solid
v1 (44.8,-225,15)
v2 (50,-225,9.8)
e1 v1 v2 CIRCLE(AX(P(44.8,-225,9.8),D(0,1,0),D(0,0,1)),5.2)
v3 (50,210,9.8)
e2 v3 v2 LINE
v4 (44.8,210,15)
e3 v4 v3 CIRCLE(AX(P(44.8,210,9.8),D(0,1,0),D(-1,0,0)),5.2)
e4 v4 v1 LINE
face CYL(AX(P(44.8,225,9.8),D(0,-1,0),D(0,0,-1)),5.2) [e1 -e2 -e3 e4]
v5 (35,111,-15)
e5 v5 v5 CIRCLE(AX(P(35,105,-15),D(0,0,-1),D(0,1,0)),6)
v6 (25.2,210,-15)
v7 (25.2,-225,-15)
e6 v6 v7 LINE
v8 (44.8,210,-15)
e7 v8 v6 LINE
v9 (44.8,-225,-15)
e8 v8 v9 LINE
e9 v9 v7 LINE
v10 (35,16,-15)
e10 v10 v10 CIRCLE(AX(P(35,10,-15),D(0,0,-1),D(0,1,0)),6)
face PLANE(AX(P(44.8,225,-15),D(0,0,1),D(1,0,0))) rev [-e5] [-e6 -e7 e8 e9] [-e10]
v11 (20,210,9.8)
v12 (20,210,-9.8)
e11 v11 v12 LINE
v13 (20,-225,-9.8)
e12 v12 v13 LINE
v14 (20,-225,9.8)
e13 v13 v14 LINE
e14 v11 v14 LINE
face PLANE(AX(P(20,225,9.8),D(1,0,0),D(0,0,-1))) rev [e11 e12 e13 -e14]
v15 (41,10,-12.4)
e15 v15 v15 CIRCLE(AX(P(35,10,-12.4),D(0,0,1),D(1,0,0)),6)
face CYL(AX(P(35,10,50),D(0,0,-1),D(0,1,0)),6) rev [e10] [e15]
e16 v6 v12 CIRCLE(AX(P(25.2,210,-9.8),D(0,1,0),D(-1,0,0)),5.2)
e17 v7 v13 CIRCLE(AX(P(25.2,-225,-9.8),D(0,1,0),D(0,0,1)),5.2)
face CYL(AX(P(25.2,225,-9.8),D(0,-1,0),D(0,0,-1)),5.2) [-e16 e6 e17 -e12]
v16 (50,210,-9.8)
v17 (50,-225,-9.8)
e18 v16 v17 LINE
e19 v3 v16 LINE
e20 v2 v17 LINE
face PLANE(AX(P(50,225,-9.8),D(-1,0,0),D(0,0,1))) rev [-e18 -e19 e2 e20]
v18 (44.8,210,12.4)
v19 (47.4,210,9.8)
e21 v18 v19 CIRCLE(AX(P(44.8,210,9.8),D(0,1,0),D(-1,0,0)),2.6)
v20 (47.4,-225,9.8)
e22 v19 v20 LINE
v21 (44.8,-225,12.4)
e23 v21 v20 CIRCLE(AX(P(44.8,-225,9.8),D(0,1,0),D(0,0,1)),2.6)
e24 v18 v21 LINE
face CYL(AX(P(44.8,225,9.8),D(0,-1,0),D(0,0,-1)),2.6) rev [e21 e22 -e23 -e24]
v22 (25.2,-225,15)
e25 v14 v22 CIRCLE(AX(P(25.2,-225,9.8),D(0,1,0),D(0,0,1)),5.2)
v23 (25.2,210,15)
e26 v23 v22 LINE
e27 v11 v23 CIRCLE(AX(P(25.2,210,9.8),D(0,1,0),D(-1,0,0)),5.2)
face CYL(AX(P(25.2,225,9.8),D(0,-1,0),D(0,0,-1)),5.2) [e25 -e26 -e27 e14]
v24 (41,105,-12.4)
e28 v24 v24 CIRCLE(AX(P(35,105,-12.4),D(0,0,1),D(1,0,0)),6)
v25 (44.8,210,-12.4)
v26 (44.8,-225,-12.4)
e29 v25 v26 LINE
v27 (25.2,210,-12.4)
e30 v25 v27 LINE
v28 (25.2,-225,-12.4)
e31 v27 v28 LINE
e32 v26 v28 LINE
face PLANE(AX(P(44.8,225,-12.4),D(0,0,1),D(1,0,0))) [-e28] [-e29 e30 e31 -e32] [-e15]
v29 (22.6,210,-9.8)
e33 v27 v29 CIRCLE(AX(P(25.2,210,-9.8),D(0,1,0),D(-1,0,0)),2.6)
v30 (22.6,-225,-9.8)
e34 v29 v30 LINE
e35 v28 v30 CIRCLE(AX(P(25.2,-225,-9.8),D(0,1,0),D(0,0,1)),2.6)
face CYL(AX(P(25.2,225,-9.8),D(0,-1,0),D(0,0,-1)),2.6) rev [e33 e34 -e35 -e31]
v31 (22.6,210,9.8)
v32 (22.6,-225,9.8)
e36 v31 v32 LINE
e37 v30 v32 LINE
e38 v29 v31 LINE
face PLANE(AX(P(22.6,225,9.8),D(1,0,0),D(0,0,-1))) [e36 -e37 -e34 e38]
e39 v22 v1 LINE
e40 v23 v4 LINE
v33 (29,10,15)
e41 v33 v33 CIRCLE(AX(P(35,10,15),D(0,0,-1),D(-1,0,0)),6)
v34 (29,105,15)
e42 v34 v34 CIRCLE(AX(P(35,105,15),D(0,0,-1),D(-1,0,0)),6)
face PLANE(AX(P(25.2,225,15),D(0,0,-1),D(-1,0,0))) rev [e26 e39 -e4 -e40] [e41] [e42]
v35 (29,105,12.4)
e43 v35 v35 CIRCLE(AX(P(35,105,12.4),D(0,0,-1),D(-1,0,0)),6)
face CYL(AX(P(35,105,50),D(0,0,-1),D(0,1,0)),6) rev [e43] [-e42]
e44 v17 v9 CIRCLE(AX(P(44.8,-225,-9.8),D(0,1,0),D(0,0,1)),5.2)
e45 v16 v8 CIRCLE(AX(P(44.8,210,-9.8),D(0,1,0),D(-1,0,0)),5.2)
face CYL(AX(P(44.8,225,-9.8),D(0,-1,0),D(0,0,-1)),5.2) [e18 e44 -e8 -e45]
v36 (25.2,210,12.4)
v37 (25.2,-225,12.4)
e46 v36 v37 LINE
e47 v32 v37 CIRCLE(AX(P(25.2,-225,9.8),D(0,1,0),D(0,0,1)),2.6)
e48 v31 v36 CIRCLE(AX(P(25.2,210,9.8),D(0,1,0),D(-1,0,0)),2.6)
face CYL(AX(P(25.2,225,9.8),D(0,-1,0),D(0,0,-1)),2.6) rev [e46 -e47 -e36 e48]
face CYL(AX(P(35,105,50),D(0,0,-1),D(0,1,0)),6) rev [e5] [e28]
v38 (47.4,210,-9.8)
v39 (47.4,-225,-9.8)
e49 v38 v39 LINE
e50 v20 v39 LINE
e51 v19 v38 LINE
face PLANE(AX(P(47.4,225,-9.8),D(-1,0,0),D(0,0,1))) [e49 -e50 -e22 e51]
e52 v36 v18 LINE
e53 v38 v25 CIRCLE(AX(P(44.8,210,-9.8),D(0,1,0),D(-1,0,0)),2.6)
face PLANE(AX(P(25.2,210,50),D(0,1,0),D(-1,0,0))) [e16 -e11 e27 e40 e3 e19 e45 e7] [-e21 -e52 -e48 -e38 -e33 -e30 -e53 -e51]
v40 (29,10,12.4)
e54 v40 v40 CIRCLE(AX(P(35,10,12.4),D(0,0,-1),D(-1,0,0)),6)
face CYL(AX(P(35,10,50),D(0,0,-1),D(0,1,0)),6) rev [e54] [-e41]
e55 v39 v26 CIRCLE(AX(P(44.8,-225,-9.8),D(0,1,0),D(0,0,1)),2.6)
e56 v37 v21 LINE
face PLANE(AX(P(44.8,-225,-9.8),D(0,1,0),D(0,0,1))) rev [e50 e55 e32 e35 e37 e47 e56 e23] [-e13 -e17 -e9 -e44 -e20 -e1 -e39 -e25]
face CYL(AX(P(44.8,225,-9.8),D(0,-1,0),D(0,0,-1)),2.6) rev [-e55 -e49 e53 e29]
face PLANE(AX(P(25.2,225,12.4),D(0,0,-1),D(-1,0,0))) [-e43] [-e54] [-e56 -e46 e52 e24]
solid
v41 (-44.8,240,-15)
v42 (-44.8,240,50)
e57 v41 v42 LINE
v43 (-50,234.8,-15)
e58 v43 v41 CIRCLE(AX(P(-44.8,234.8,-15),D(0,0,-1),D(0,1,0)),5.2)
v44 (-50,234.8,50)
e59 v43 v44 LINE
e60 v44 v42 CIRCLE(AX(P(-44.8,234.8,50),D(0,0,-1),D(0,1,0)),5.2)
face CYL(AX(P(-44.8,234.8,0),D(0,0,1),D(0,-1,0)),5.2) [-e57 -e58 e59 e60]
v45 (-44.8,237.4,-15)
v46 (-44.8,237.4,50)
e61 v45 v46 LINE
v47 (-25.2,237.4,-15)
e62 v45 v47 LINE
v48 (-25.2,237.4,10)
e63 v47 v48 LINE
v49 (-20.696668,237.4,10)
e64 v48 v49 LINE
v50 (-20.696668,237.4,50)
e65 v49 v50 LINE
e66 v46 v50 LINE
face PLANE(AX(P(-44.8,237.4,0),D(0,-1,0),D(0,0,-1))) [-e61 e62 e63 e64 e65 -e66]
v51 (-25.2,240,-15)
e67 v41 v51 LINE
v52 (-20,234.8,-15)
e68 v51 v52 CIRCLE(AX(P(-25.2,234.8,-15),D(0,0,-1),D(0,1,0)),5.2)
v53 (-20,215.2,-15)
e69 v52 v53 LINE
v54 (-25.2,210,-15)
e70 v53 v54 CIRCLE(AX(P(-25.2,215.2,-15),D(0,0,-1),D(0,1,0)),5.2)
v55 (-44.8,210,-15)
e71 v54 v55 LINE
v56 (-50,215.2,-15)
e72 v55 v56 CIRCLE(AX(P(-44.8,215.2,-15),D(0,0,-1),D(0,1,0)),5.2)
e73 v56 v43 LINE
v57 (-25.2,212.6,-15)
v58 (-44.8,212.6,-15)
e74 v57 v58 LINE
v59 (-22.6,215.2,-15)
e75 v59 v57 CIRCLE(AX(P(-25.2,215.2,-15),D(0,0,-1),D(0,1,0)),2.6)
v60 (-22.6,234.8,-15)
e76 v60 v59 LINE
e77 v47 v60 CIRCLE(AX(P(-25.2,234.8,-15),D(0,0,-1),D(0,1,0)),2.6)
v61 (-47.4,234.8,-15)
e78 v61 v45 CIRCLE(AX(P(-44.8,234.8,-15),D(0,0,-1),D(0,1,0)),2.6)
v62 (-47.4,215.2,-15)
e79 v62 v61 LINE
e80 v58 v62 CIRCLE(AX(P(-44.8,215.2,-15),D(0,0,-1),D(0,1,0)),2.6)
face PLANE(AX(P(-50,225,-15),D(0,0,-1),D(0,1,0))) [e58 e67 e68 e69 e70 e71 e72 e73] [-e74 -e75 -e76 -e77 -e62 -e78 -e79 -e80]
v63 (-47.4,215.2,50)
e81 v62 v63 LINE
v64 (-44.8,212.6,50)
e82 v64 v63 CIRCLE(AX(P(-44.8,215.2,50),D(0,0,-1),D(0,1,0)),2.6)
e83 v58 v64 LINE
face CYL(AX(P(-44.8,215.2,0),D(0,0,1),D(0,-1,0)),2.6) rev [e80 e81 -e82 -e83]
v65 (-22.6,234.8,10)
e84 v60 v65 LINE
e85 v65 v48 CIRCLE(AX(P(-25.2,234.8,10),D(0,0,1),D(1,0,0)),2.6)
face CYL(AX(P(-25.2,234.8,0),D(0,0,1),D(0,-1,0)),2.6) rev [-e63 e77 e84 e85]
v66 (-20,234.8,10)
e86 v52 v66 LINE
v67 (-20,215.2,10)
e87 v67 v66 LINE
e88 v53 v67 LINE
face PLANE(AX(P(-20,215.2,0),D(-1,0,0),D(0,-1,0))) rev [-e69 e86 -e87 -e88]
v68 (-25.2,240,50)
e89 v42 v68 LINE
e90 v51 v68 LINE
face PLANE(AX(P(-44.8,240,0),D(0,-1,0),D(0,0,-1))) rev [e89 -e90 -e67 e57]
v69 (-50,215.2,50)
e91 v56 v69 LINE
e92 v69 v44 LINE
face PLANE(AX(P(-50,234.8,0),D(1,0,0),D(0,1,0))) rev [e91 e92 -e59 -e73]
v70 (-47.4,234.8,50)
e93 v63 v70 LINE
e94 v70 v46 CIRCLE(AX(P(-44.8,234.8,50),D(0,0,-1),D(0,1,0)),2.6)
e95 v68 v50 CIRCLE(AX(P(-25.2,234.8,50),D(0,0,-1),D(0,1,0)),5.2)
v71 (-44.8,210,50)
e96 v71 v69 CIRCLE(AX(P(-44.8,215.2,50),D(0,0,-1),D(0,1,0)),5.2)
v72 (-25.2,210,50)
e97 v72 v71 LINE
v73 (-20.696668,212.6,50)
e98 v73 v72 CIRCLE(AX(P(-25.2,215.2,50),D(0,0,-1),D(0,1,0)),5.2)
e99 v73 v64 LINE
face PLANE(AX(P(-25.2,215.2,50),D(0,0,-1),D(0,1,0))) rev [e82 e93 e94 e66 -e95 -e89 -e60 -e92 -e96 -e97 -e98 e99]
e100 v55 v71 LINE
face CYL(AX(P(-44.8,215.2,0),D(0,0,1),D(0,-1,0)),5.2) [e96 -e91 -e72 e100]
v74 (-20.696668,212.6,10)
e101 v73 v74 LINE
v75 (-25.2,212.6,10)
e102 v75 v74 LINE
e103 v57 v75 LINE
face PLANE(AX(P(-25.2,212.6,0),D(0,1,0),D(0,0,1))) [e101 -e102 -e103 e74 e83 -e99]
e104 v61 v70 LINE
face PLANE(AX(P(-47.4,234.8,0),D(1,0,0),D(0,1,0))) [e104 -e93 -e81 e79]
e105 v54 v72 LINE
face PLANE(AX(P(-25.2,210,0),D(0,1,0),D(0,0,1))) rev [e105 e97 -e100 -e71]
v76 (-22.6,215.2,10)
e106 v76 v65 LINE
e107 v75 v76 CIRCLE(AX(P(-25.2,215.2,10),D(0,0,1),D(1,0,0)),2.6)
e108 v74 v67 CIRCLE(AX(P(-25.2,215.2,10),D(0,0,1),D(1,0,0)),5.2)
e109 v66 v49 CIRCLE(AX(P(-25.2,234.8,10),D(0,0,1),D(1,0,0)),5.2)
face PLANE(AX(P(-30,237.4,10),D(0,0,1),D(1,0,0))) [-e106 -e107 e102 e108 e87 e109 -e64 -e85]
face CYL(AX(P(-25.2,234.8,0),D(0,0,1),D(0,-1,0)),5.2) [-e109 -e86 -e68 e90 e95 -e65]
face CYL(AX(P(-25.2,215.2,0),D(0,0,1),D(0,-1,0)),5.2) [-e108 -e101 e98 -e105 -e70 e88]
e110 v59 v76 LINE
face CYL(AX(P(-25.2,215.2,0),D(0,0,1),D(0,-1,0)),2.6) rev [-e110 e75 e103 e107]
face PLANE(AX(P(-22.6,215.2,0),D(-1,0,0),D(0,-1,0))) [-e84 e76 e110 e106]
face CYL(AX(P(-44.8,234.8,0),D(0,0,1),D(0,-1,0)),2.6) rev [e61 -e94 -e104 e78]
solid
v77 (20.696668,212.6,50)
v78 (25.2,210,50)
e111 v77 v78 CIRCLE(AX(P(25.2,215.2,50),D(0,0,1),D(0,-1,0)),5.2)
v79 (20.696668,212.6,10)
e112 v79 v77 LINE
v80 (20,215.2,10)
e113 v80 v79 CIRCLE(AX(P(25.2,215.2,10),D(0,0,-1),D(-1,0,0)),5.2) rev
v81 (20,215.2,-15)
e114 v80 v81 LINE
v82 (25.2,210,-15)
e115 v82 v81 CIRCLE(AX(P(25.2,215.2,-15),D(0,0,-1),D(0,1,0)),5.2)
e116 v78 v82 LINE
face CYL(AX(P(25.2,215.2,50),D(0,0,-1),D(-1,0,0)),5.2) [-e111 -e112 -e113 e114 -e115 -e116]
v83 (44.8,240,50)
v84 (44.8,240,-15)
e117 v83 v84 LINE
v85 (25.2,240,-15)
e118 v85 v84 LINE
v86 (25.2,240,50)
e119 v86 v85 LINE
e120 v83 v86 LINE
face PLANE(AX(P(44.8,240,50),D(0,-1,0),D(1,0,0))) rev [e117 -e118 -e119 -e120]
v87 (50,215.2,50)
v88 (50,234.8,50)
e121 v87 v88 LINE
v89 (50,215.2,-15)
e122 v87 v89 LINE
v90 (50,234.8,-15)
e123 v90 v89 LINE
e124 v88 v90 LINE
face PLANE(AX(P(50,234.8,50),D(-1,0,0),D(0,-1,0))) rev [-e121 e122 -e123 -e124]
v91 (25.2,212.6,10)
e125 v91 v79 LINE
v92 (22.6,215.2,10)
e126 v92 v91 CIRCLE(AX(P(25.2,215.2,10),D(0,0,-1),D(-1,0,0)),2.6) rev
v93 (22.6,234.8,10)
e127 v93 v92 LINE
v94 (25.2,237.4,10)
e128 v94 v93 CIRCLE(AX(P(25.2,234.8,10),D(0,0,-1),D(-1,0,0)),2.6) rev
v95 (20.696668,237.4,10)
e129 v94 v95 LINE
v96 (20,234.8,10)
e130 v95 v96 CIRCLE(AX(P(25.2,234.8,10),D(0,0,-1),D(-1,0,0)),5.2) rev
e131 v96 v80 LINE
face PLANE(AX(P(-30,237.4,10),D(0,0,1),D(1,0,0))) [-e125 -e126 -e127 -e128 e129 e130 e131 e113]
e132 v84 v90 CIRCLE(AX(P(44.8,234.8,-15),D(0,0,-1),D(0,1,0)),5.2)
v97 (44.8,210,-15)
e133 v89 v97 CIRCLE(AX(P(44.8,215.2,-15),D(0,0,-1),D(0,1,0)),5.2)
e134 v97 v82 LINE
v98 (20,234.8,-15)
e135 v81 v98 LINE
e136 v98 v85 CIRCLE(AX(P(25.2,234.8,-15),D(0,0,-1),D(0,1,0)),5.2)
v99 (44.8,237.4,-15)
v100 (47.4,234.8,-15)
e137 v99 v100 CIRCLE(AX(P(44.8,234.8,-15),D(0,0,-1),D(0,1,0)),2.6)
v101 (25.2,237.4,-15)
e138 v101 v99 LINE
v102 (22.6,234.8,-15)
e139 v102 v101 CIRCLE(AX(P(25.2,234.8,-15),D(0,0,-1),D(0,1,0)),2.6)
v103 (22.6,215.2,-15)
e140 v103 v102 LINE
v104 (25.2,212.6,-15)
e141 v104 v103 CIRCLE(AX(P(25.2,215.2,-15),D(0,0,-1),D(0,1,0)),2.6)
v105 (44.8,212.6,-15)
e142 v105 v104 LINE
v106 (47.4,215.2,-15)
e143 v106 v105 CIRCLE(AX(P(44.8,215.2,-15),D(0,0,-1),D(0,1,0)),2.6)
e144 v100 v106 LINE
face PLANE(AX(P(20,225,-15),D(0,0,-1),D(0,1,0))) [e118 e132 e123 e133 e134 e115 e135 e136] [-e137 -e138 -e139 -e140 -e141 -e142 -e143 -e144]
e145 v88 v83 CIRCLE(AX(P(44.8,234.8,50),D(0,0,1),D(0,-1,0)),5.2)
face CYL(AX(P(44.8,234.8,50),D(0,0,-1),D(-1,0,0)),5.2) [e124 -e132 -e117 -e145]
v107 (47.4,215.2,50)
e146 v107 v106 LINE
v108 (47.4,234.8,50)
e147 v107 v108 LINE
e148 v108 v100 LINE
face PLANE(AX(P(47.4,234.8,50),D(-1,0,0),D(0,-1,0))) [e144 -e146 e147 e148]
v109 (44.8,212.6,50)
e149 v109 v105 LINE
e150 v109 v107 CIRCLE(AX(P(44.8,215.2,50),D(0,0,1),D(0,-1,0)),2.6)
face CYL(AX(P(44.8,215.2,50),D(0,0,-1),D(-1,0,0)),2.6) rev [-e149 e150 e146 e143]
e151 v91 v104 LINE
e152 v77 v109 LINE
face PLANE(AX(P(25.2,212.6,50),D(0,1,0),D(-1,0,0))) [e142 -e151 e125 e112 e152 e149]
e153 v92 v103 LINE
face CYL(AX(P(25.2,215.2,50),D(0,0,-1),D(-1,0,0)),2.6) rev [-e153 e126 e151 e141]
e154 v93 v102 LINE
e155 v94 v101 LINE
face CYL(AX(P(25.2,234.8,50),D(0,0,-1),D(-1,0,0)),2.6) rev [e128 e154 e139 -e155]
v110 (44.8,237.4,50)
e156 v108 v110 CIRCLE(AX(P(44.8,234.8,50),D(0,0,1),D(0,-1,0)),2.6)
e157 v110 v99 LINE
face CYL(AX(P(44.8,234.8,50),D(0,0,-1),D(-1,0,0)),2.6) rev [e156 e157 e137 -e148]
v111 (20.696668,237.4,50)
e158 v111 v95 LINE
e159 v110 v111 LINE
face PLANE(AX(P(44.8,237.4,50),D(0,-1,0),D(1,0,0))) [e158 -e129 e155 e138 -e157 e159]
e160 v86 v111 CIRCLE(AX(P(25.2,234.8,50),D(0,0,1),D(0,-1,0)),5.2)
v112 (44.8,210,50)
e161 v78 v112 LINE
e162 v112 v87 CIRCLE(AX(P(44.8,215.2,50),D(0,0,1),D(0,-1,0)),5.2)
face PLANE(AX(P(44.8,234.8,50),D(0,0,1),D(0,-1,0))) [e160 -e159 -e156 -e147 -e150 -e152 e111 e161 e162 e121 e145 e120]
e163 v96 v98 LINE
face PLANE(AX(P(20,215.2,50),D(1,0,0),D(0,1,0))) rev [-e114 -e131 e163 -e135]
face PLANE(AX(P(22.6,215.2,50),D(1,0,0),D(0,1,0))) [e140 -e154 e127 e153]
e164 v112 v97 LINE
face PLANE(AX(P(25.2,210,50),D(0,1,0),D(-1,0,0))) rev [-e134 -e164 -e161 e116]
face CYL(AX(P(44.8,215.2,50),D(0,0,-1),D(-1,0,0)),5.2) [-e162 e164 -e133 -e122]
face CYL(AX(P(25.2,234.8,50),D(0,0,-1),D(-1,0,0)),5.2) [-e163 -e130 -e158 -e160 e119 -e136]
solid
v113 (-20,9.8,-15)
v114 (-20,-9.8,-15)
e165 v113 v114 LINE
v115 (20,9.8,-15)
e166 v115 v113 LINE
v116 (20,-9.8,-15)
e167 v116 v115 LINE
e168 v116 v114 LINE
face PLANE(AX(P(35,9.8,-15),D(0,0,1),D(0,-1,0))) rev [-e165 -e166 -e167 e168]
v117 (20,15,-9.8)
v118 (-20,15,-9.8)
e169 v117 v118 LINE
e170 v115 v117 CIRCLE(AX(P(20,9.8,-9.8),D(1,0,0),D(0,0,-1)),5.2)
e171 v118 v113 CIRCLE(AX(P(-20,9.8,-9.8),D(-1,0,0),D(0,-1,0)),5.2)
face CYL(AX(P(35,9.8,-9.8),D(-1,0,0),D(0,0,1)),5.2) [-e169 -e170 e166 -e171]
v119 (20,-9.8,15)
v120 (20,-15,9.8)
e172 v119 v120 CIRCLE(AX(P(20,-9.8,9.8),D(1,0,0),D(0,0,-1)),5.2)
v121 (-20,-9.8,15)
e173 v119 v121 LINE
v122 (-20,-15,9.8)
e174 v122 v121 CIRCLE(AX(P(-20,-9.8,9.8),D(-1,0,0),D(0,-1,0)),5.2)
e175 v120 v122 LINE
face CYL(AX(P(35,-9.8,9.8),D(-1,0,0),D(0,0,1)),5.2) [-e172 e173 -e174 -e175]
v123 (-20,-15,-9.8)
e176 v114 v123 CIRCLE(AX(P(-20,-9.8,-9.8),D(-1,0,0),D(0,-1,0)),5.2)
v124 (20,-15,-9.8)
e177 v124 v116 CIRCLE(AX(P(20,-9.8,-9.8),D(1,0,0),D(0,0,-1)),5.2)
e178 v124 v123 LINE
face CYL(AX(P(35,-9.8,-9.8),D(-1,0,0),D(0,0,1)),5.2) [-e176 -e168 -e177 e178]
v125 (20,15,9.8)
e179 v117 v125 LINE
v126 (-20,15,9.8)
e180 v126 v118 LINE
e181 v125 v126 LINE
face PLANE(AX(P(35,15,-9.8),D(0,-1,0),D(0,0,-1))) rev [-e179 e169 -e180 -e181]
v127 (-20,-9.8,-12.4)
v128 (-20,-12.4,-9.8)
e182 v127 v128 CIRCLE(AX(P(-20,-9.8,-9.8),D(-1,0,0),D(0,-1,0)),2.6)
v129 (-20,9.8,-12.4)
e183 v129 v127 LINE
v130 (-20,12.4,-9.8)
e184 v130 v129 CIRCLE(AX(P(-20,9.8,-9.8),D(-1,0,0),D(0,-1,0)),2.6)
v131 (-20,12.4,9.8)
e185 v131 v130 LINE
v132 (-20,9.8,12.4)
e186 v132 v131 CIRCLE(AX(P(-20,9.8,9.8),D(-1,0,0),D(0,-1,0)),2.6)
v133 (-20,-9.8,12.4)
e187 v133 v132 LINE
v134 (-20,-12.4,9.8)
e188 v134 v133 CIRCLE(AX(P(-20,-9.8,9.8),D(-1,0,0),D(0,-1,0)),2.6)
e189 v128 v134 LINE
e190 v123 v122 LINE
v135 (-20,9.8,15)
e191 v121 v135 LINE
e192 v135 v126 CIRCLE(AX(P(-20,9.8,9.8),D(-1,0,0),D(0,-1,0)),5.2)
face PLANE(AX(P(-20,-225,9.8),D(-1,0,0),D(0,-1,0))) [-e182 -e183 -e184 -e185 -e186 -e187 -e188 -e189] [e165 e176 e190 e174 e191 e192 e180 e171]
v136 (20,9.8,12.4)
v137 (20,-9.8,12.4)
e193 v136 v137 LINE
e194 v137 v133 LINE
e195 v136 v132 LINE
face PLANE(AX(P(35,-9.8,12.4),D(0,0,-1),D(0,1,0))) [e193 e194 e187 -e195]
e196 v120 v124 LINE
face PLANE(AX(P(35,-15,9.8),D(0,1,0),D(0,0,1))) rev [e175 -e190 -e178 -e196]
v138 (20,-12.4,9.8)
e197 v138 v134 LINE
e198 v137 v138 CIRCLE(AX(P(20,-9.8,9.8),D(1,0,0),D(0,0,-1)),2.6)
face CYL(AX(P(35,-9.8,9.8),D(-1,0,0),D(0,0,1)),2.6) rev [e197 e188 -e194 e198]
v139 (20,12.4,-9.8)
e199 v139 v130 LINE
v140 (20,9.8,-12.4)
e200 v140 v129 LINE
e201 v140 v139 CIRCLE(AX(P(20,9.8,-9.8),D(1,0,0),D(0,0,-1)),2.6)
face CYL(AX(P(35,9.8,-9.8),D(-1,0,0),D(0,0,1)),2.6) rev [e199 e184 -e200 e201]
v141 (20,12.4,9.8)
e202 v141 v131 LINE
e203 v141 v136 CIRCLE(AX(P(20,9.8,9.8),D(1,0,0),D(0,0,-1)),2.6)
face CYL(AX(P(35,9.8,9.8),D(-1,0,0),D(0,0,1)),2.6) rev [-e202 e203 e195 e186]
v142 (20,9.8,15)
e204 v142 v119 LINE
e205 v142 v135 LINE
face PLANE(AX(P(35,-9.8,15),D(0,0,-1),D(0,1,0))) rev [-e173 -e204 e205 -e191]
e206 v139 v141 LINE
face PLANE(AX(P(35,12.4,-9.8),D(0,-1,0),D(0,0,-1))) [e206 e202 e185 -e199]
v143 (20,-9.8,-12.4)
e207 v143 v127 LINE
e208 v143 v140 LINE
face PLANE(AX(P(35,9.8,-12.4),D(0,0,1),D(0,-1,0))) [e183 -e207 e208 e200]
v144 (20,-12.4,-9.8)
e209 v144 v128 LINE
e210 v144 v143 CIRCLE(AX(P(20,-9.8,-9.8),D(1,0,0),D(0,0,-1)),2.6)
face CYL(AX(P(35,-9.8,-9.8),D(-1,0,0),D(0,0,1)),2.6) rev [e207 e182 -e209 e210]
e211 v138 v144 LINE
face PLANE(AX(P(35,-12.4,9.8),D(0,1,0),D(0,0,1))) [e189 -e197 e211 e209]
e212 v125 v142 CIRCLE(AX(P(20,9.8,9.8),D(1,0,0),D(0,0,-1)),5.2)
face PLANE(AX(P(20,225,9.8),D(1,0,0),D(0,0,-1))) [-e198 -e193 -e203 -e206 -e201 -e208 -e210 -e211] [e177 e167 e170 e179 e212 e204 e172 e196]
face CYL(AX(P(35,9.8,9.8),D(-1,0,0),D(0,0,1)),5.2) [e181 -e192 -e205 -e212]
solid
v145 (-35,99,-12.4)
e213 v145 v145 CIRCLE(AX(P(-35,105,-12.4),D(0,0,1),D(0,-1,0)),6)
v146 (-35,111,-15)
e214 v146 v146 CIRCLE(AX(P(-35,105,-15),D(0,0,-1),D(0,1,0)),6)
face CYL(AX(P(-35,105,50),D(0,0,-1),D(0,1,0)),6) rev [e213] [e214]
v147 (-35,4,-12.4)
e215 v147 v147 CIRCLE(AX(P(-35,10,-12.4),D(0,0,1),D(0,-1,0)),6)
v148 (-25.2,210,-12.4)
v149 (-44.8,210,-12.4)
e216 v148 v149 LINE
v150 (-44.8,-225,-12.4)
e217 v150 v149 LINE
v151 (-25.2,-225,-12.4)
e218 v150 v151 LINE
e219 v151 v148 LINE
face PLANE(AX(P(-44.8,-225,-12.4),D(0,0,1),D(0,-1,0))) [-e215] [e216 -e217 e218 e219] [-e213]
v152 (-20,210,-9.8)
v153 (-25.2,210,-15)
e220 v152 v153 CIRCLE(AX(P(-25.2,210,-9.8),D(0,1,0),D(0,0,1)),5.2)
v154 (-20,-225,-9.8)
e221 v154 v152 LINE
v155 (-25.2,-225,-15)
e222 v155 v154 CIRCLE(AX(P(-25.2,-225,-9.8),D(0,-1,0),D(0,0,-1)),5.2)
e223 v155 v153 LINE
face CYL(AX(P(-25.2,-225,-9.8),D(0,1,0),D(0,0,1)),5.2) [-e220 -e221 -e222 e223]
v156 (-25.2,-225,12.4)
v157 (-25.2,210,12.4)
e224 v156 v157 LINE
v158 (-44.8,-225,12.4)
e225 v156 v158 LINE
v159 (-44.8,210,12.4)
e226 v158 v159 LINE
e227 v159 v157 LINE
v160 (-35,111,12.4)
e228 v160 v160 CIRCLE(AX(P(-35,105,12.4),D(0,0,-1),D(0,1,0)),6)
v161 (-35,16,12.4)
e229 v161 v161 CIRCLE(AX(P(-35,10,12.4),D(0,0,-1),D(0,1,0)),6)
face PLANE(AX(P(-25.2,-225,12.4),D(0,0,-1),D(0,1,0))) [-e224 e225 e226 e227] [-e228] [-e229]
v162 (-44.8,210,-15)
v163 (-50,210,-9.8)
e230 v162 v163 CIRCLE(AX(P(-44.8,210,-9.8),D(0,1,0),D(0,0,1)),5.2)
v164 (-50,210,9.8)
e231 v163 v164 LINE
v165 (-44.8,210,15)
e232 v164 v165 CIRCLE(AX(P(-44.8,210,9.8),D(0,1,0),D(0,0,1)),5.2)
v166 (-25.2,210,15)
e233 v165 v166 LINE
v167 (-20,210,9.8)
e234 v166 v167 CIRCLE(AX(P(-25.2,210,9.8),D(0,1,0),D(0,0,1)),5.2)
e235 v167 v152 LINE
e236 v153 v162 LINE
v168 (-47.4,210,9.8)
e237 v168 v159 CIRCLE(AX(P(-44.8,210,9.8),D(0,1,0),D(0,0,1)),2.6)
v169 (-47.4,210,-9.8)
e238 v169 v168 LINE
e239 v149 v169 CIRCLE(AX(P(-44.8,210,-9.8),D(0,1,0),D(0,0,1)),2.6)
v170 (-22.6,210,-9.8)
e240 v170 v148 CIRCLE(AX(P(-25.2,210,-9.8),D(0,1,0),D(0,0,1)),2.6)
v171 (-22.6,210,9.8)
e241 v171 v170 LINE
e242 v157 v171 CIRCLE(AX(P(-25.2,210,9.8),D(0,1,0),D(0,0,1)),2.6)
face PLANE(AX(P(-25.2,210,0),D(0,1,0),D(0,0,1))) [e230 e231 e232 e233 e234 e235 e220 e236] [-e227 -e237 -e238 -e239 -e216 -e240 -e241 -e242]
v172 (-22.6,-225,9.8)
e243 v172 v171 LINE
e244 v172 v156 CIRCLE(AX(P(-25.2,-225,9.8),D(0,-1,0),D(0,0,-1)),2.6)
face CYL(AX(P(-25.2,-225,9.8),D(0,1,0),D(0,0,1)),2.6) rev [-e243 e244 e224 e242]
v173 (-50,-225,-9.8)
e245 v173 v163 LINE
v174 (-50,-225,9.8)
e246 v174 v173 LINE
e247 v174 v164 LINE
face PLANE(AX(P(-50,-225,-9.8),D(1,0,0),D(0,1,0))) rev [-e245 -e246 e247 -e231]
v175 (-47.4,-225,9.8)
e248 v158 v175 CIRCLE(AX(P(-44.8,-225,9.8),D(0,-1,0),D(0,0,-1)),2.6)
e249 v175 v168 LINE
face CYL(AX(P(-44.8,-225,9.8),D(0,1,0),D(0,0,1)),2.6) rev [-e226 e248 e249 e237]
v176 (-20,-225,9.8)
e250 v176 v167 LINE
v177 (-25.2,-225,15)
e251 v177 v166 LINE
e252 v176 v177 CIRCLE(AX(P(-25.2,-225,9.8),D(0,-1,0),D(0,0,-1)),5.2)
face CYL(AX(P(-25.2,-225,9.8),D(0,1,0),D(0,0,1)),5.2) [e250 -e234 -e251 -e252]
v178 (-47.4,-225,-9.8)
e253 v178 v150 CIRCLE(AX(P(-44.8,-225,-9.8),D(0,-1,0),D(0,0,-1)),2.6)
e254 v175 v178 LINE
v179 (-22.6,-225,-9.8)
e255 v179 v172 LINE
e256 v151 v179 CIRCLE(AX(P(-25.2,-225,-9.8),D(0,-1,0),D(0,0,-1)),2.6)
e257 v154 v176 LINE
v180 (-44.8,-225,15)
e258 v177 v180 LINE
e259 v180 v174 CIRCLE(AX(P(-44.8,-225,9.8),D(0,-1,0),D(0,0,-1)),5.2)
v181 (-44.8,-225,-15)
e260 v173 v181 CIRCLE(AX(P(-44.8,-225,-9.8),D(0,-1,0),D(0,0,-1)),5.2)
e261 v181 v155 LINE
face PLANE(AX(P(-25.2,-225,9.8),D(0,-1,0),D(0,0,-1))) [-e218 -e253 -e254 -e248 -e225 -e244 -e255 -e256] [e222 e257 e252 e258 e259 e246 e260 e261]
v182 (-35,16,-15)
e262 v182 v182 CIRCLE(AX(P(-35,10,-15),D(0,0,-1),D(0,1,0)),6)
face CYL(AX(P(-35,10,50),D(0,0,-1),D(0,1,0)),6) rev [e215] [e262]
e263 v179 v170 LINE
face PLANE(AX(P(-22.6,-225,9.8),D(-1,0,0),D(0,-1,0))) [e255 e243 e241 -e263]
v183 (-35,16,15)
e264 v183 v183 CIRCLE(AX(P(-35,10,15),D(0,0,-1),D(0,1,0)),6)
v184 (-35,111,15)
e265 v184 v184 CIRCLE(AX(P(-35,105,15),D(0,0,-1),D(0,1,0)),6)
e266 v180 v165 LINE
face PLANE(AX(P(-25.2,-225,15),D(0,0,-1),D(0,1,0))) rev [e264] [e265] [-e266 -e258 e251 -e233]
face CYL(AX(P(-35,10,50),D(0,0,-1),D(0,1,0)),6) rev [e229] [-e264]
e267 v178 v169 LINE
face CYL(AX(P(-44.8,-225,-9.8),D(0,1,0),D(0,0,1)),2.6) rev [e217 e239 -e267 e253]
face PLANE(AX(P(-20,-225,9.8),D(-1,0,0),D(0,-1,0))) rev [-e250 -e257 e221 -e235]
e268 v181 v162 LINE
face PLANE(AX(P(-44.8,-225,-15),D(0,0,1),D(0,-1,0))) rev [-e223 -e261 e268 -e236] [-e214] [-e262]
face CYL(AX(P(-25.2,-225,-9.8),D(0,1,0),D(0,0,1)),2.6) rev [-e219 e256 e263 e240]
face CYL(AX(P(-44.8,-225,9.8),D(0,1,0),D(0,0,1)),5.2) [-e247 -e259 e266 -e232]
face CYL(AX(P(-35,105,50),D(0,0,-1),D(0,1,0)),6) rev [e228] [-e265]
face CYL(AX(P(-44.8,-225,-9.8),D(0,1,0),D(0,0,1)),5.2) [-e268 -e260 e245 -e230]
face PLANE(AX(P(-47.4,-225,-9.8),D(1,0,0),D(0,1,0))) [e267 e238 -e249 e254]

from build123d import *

# Parameters (mm, degrees)
RURA_START                              = -15
RURA_KWADRATOWA_30_X_30_X_2_6_1_DEPTH   = 65
RURA_START_2                            = -225
RURA_KWADRATOWA_30_X_30_X_2_6_1_2_DEPTH = 435
RURA_START_3                            = -20
RURA_KWADRATOWA_30_X_30_X_2_6_1_3_DEPTH = 40
WYTNIJ_WYCI_GNI_CIE1_START              = -5.2
SZKIC3_W                                = 40
SZKIC3_H                                = 24.8
WYTNIJ_WYCI_GNI_CIE1_DEPTH              = 50.4
SZKIC4_R                                = 6
WYTNIJ_WYCI_GNI_CIE2_DEPTH              = 254.623737059


# Read off the part's stored shape, not the designer's step: Rura kwadratowa 30 X 30 X 2.6(1)
with BuildPart() as part:
    # Rura kwadratowa 30 X 30 X 2.6(1) outline → Rura kwadratowa 30 X 30 X 2.6(1) (new body)
    # profile 1 of 2: a face of its own
    with BuildSketch(Plane.XY.offset(RURA_START)):
        with BuildLine():
            Line((-44.8, 210), (-25.2, 210))
            ThreePointArc((-25.2, 210), (-21.523044738, 211.523044738), (-20, 215.2))
            Line((-20, 215.2), (-20, 234.8))
            ThreePointArc((-20, 234.8), (-21.523044738, 238.476955262), (-25.2, 240))
            Line((-25.2, 240), (-44.8, 240))
            ThreePointArc((-44.8, 240), (-48.476955262, 238.476955262), (-50, 234.8))
            Line((-50, 234.8), (-50, 215.2))
            ThreePointArc((-50, 215.2), (-48.476955262, 211.523044738), (-44.8, 210))
        make_face()
        with BuildLine():
            ThreePointArc((-44.8, 212.6), (-46.638477631, 213.361522369), (-47.4, 215.2))
            Line((-47.4, 215.2), (-47.4, 234.8))
            ThreePointArc((-47.4, 234.8), (-46.638477631, 236.638477631), (-44.8, 237.4))
            Line((-44.8, 237.4), (-25.2, 237.4))
            ThreePointArc((-25.2, 237.4), (-23.361522369, 236.638477631), (-22.6, 234.8))
            Line((-22.6, 234.8), (-22.6, 215.2))
            ThreePointArc((-22.6, 215.2), (-23.361522369, 213.361522369), (-25.2, 212.6))
            Line((-25.2, 212.6), (-44.8, 212.6))
        make_face(mode=Mode.SUBTRACT)
    # profile 2 of 2: a face of its own
    with BuildSketch(Plane.XY.offset(RURA_START)):
        with BuildLine():
            ThreePointArc((50, 234.8), (48.476955262, 238.476955262), (44.8, 240))
            Line((44.8, 240), (25.2, 240))
            ThreePointArc((25.2, 240), (21.523044738, 238.476955262), (20, 234.8))
            Line((20, 234.8), (20, 215.2))
            ThreePointArc((20, 215.2), (21.523044738, 211.523044738), (25.2, 210))
            Line((25.2, 210), (44.8, 210))
            ThreePointArc((44.8, 210), (48.476955262, 211.523044738), (50, 215.2))
            Line((50, 215.2), (50, 234.8))
        make_face()
        with BuildLine():
            Line((22.6, 215.2), (22.6, 234.8))
            ThreePointArc((22.6, 234.8), (23.361522369, 236.638477631), (25.2, 237.4))
            Line((25.2, 237.4), (44.8, 237.4))
            ThreePointArc((44.8, 237.4), (46.638477631, 236.638477631), (47.4, 234.8))
            Line((47.4, 234.8), (47.4, 215.2))
            ThreePointArc((47.4, 215.2), (46.638477631, 213.361522369), (44.8, 212.6))
            Line((44.8, 212.6), (25.2, 212.6))
            ThreePointArc((25.2, 212.6), (23.361522369, 213.361522369), (22.6, 215.2))
        make_face(mode=Mode.SUBTRACT)
    extrude(amount=RURA_KWADRATOWA_30_X_30_X_2_6_1_DEPTH)

    # Szkic3 → Wytnij-wyciągnięcie1 (cut)
    with BuildSketch(Plane.ZY.offset(-20).offset(WYTNIJ_WYCI_GNI_CIE1_START)):
        with Locations((30, 225)):
            Rectangle(SZKIC3_W, SZKIC3_H)
    extrude(amount=WYTNIJ_WYCI_GNI_CIE1_DEPTH, mode=Mode.SUBTRACT)


with BuildPart() as body_2:
    # Rura kwadratowa 30 X 30 X 2.6_1 2 outlin → Rura kwadratowa 30 X 30 X 2.6_1 2 (new body)
    # profile 1 of 2: a face of its own
    with BuildSketch(Plane(origin=(0, 0, 0), x_dir=(1, 0, 0), z_dir=(0, 1, 0)).offset(RURA_START_2)):
        with BuildLine():
            Line((-20, -9.8), (-20, 9.8))
            ThreePointArc((-20, 9.8), (-21.523044738, 13.476955262), (-25.2, 15))
            Line((-25.2, 15), (-44.8, 15))
            ThreePointArc((-44.8, 15), (-48.476955262, 13.476955262), (-50, 9.8))
            Line((-50, 9.8), (-50, -9.8))
            ThreePointArc((-50, -9.8), (-48.476955262, -13.476955262), (-44.8, -15))
            Line((-44.8, -15), (-25.2, -15))
            ThreePointArc((-25.2, -15), (-21.523044738, -13.476955262), (-20, -9.8))
        make_face()
        with BuildLine():
            ThreePointArc((-44.8, -12.4), (-46.638477631, -11.638477631), (-47.4, -9.8))
            Line((-47.4, -9.8), (-47.4, 9.8))
            ThreePointArc((-47.4, 9.8), (-46.638477631, 11.638477631), (-44.8, 12.4))
            Line((-44.8, 12.4), (-25.2, 12.4))
            ThreePointArc((-25.2, 12.4), (-23.361522369, 11.638477631), (-22.6, 9.8))
            Line((-22.6, 9.8), (-22.6, -9.8))
            ThreePointArc((-22.6, -9.8), (-23.361522369, -11.638477631), (-25.2, -12.4))
            Line((-25.2, -12.4), (-44.8, -12.4))
        make_face(mode=Mode.SUBTRACT)
    # profile 2 of 2: a face of its own
    with BuildSketch(Plane(origin=(0, 0, 0), x_dir=(1, 0, 0), z_dir=(0, 1, 0)).offset(RURA_START_2)):
        with BuildLine():
            ThreePointArc((50, 9.8), (48.476955262, 13.476955262), (44.8, 15))
            Line((44.8, 15), (25.2, 15))
            ThreePointArc((25.2, 15), (21.523044738, 13.476955262), (20, 9.8))
            Line((20, 9.8), (20, -9.8))
            ThreePointArc((20, -9.8), (21.523044738, -13.476955262), (25.2, -15))
            Line((25.2, -15), (44.8, -15))
            ThreePointArc((44.8, -15), (48.476955262, -13.476955262), (50, -9.8))
            Line((50, -9.8), (50, 9.8))
        make_face()
        with BuildLine():
            Line((22.6, -9.8), (22.6, 9.8))
            ThreePointArc((22.6, 9.8), (23.361522369, 11.638477631), (25.2, 12.4))
            Line((25.2, 12.4), (44.8, 12.4))
            ThreePointArc((44.8, 12.4), (46.638477631, 11.638477631), (47.4, 9.8))
            Line((47.4, 9.8), (47.4, -9.8))
            ThreePointArc((47.4, -9.8), (46.638477631, -11.638477631), (44.8, -12.4))
            Line((44.8, -12.4), (25.2, -12.4))
            ThreePointArc((25.2, -12.4), (23.361522369, -11.638477631), (22.6, -9.8))
        make_face(mode=Mode.SUBTRACT)
    extrude(amount=RURA_KWADRATOWA_30_X_30_X_2_6_1_2_DEPTH)

    # Szkic4 → Wytnij-wyciągnięcie2 (cut, through all)
    with BuildSketch(Plane(origin=(0, 0, -15), x_dir=(-1, 0, 0), z_dir=(0, 0, -1))):
        with Locations(Location((35, 105, 0), (0, 0, 90))):
            Circle(SZKIC4_R)
        with Locations(Location((35, 10, 0), (0, 0, 90))):
            Circle(SZKIC4_R)
        with Locations((-35, 105)):
            Circle(SZKIC4_R)
        with Locations((-35, 10)):
            Circle(SZKIC4_R)
    extrude(amount=-WYTNIJ_WYCI_GNI_CIE2_DEPTH, mode=Mode.SUBTRACT)


with BuildPart() as body_3:
    # Rura kwadratowa 30 X 30 X 2.6_1 3 outlin → Rura kwadratowa 30 X 30 X 2.6_1 3 (new body)
    with BuildSketch(Plane.YZ.offset(RURA_START_3)):
        with BuildLine():
            Line((-9.8, -15), (9.8, -15))
            ThreePointArc((9.8, -15), (13.476955262, -13.476955262), (15, -9.8))
            Line((15, -9.8), (15, 9.8))
            ThreePointArc((15, 9.8), (13.476955262, 13.476955262), (9.8, 15))
            Line((9.8, 15), (-9.8, 15))
            ThreePointArc((-9.8, 15), (-13.476955262, 13.476955262), (-15, 9.8))
            Line((-15, 9.8), (-15, -9.8))
            ThreePointArc((-15, -9.8), (-13.476955262, -13.476955262), (-9.8, -15))
        make_face()
        with BuildLine():
            ThreePointArc((-12.4, 9.8), (-11.638477631, 11.638477631), (-9.8, 12.4))
            Line((-9.8, 12.4), (9.8, 12.4))
            ThreePointArc((9.8, 12.4), (11.638477631, 11.638477631), (12.4, 9.8))
            Line((12.4, 9.8), (12.4, -9.8))
            ThreePointArc((12.4, -9.8), (11.638477631, -11.638477631), (9.8, -12.4))
            Line((9.8, -12.4), (-9.8, -12.4))
            ThreePointArc((-9.8, -12.4), (-11.638477631, -11.638477631), (-12.4, -9.8))
            Line((-12.4, -9.8), (-12.4, 9.8))
        make_face(mode=Mode.SUBTRACT)
    extrude(amount=RURA_KWADRATOWA_30_X_30_X_2_6_1_3_DEPTH)


solid = Compound([part.part, body_2.part, body_3.part])
